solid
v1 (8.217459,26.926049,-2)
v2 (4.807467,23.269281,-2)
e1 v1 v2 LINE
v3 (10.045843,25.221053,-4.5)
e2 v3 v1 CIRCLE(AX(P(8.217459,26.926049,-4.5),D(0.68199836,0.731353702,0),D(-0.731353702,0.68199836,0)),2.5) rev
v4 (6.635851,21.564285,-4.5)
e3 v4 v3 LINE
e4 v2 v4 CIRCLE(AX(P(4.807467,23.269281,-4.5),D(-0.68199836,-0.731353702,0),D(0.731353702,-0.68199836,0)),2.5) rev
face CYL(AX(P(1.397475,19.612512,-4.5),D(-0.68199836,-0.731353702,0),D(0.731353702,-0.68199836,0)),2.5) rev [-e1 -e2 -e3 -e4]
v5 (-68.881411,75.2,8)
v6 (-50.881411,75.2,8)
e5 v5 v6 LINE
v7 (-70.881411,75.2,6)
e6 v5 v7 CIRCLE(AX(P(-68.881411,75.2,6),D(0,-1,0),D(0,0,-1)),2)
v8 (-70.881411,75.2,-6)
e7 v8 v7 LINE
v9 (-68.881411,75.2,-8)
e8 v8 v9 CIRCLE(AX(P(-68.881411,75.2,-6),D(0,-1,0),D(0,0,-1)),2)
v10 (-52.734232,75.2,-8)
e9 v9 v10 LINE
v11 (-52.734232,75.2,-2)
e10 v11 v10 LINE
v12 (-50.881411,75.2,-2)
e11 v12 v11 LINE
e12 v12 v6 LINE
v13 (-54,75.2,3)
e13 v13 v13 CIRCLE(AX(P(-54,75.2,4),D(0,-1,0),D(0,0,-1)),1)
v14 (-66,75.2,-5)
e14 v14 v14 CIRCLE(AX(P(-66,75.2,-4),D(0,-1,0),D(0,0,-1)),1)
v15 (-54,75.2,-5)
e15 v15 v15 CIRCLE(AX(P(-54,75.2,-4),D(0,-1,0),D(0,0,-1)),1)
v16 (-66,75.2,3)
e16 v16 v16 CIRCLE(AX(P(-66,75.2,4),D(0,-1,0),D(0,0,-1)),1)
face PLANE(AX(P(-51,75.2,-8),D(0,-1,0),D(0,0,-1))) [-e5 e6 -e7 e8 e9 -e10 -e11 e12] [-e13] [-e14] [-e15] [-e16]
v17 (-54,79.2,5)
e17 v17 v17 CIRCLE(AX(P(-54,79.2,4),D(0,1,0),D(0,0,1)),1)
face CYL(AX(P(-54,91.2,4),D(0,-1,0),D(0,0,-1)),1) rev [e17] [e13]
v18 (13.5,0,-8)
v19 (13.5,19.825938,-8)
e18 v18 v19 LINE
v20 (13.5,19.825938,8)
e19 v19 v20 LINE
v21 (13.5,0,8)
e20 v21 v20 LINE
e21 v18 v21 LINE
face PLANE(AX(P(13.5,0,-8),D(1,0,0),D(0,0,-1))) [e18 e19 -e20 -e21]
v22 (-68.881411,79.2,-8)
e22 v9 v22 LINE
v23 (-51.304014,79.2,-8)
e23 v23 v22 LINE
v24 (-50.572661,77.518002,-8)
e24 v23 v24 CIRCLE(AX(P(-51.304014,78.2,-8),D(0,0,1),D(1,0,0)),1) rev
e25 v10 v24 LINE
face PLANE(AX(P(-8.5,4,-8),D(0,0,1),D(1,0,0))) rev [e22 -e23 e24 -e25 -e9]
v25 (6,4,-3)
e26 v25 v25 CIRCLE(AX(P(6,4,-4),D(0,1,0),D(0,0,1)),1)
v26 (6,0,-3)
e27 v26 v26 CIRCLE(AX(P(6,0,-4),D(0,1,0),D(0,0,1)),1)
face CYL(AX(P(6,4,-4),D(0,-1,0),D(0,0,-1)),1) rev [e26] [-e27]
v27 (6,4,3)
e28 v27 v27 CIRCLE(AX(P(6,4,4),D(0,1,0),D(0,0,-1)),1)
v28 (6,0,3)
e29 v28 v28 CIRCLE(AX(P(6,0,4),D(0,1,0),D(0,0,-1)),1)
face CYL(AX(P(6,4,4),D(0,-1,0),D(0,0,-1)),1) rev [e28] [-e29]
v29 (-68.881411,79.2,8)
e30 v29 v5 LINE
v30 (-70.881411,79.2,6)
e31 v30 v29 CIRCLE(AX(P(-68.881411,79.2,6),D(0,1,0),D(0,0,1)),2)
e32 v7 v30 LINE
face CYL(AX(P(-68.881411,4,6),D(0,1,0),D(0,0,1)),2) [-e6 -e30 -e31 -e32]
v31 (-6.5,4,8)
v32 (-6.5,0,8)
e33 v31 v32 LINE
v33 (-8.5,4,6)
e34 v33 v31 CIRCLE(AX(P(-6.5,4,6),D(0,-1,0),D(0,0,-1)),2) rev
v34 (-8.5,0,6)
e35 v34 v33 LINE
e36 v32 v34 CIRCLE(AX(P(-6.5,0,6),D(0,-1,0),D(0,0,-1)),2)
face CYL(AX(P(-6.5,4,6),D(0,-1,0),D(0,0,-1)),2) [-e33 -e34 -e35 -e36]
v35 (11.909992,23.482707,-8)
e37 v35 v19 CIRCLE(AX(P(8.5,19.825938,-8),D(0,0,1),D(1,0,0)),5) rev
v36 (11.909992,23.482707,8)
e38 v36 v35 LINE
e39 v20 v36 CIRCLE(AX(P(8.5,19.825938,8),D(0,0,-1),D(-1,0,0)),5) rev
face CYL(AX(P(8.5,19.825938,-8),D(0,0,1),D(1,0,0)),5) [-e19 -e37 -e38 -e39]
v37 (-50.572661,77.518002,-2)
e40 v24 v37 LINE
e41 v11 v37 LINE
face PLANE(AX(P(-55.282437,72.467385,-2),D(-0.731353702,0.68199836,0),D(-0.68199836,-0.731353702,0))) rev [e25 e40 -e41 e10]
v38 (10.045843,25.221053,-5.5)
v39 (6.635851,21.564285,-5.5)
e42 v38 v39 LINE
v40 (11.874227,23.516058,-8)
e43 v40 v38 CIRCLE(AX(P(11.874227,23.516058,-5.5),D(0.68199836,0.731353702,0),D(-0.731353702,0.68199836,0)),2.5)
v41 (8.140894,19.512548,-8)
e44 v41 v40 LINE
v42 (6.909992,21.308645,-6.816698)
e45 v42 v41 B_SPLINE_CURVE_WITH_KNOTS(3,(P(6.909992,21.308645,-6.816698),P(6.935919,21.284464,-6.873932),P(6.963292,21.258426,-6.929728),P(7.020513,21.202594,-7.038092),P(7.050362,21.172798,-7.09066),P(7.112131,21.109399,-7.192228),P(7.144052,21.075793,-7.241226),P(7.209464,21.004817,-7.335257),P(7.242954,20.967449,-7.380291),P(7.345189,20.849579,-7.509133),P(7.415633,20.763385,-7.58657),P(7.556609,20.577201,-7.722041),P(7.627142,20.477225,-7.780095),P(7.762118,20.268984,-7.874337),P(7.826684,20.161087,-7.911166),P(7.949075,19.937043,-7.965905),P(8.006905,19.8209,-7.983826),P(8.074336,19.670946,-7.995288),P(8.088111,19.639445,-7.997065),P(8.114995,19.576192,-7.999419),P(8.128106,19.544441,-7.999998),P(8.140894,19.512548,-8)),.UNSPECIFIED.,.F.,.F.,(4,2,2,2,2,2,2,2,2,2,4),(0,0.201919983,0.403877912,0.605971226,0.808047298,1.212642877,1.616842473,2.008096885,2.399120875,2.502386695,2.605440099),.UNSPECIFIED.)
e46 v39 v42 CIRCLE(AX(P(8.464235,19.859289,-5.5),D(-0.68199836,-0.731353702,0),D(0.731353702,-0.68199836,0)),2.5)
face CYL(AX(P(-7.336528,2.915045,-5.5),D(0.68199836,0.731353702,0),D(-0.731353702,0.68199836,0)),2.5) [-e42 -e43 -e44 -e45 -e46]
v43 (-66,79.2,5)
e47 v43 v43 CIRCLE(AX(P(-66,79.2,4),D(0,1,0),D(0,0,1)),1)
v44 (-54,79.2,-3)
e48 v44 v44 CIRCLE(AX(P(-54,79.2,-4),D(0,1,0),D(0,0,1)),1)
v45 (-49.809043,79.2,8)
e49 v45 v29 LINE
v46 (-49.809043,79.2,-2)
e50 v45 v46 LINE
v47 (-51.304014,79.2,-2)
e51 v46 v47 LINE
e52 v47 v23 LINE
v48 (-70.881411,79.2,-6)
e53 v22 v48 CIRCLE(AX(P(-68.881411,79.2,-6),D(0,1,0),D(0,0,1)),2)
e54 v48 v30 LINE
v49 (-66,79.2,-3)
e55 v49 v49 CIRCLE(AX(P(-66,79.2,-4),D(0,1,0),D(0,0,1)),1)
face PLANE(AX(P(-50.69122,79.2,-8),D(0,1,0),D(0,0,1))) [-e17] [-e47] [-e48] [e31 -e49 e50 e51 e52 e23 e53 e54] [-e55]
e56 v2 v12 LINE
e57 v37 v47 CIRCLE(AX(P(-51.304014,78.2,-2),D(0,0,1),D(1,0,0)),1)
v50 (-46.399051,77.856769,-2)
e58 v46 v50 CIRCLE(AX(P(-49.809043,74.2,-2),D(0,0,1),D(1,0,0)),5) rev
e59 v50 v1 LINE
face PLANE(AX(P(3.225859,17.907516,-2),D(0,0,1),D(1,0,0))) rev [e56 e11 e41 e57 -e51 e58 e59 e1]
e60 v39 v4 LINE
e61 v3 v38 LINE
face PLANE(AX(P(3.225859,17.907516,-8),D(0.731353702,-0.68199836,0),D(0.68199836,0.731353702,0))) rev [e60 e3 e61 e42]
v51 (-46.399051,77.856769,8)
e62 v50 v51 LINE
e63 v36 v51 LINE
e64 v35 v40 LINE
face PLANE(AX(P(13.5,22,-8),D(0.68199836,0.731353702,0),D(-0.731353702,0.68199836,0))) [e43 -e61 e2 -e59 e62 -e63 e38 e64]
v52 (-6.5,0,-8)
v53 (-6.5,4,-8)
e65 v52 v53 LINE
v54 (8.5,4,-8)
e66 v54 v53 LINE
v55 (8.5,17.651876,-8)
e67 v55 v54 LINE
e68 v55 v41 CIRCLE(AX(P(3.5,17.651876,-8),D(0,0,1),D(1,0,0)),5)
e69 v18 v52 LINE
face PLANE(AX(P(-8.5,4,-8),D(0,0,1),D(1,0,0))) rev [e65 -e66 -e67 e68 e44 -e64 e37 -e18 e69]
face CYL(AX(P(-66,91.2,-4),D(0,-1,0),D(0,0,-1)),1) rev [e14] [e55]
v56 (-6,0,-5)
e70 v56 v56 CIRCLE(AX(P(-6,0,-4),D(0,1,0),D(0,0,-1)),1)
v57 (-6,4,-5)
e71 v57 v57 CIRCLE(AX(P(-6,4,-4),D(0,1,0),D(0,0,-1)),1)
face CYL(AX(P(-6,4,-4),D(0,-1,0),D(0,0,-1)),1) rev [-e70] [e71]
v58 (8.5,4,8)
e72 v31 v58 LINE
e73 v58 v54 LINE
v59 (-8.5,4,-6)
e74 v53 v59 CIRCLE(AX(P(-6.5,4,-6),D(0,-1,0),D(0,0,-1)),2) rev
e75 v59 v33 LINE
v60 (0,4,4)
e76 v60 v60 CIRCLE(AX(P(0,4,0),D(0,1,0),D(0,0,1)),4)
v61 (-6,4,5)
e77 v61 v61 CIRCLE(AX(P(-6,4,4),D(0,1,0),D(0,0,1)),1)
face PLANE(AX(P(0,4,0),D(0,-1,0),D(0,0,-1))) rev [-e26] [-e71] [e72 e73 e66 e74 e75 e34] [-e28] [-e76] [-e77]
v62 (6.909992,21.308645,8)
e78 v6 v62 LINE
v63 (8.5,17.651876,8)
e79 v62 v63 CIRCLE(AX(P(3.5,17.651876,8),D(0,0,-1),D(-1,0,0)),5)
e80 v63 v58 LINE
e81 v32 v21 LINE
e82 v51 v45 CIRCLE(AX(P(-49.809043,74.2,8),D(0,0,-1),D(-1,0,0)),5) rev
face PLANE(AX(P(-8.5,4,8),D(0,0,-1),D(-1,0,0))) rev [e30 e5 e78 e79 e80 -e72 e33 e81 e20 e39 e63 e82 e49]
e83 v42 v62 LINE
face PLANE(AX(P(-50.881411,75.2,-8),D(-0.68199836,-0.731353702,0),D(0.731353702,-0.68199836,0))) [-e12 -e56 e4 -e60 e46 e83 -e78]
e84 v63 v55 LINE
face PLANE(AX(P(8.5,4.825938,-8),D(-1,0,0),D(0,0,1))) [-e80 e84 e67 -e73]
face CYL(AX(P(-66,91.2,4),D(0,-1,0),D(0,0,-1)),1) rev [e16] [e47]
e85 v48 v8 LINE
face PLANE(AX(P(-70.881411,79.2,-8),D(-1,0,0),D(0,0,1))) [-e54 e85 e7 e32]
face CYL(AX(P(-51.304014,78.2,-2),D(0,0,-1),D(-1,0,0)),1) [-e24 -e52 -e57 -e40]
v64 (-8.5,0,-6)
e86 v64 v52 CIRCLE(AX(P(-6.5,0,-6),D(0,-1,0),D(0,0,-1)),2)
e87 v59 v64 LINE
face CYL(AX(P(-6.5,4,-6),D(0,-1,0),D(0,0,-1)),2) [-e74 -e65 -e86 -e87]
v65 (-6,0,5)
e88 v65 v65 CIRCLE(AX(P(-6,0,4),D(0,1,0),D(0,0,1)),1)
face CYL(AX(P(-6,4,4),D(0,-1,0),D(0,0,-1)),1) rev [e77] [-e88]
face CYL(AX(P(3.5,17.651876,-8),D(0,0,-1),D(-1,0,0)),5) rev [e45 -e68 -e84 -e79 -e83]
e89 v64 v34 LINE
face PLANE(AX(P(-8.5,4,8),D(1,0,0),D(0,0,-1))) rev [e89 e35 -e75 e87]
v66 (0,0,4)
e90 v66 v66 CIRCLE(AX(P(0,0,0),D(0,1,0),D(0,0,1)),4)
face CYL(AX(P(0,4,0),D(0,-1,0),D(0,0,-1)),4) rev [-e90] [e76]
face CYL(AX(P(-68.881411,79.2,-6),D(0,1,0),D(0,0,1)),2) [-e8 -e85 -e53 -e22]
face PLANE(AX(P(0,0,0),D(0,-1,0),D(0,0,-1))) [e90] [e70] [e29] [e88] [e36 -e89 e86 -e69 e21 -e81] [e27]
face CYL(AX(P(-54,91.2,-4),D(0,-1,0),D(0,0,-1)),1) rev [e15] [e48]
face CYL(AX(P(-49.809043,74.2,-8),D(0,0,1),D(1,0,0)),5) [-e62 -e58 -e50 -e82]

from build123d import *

# Parameters (mm, degrees)
SKETCH_1_W          = 17
SKETCH_1_H          = 16
SKETCH_1_R          = 1
SKETCH_1_R_2        = 4
EXTRUDE_1_DEPTH     = 4
EXTRUDE_2_DEPTH     = 16
SKETCH_4_R          = 1
CUT_EXTRUDE_1_DEPTH = 16
FILLET_1_R          = 2
FILLET_2_R          = 5
SKETCH_7_W          = 6
SKETCH_7_H          = 80
CUT_EXTRUDE_2_DEPTH = 10
FILLET_3_R          = 1
FILLET_4_R          = 2.5


with BuildPart() as part:
    # 草图1 → 凸台-拉伸1 (new body)
    with BuildSketch(Plane(origin=(0, 0, 0), x_dir=(1, 0, 0), z_dir=(0, 1, 0))):
        Rectangle(SKETCH_1_W, SKETCH_1_H)
        with Locations(Location((6, 4, 0), (0, 0, 270))):
            Circle(SKETCH_1_R, mode=Mode.SUBTRACT)
        with Locations(Location((-6, 4, 0), (0, 0, 90))):
            Circle(SKETCH_1_R, mode=Mode.SUBTRACT)
        with Locations(Location((6, -4, 0), (0, 0, 90))):
            Circle(SKETCH_1_R, mode=Mode.SUBTRACT)
        with Locations(Location((-6, -4, 0), (0, 0, 270))):
            Circle(SKETCH_1_R, mode=Mode.SUBTRACT)
        with Locations(Location((0, 0, 0), (0, 0, 270))):
            Circle(SKETCH_1_R_2, mode=Mode.SUBTRACT)
    extrude(amount=EXTRUDE_1_DEPTH)

    # 草图2 → 凸台-拉伸2 (add)
    with BuildSketch(Plane.XY.offset(8)):
        Polygon((8.5, 4.825938125), (8.5, 0), (13.5, 0), (13.5, 22), (-47.839490213, 79.2), (-50.691220222, 79.2), (-70.881411302, 79.2), (-70.881411302, 75.2), (-51, 75.2), (-50.881411302, 75.2), (8.5, 19.825938125), align=None)
    extrude(amount=-EXTRUDE_2_DEPTH)

    # 草图4 → 切除-拉伸1 (cut)
    with BuildSketch(Plane.XZ.offset(-75.2)):
        with Locations(Location((-54, 4, 0), (0, 0, 270))):
            Circle(SKETCH_4_R)
        with Locations(Location((-54, -4, 0), (0, 0, 270))):
            Circle(SKETCH_4_R)
        with Locations(Location((-66, -4, 0), (0, 0, 270))):
            Circle(SKETCH_4_R)
        with Locations(Location((-66, 4, 0), (0, 0, 270))):
            Circle(SKETCH_4_R)
    extrude(amount=-CUT_EXTRUDE_1_DEPTH, mode=Mode.SUBTRACT)

    # 圆角1
    fillet_1_edges = [part.edges().sort_by_distance(p)[0] for p in [
        (-70.881411302, 77.2, -8),
        (-70.881411302, 77.2, 8),
        (-8.5, 2, 8),
        (-8.5, 2, -8),
    ]]
    fillet(fillet_1_edges, radius=FILLET_1_R)

    # 圆角2
    fillet_2_edges = [part.edges().sort_by_distance(p)[0] for p in [
        (8.5, 19.825938125, 0),
        (-47.839490213, 79.2, 0),
        (13.5, 22, 0),
    ]]
    fillet(fillet_2_edges, radius=FILLET_2_R)

    # 草图7 → 切除-拉伸2 (cut)
    with BuildSketch(Plane(origin=(17.252348355, 18.50087855, 0), x_dir=(0, 0, -1), z_dir=(0.6819983600624965, 0.7313537016191725, 0))):
        with Locations((5, 49.853652648)):
            Rectangle(SKETCH_7_W, SKETCH_7_H)
    extrude(amount=-CUT_EXTRUDE_2_DEPTH, mode=Mode.SUBTRACT)

    # 圆角3
    # the kernel refuses this fillet: 1 mm, written as the material it takes off along each edge
    with BuildSketch(Plane(origin=(-49.057187154, 79.143148127, -2), x_dir=(-0.9996800282081353, 0.02529508256127706, 0), z_dir=(0, 0, -1))) as fillet_3_piece_1:
        with BuildLine():
            CenterArc((2.222251386, -0.999680028), FILLET_3_R, 88.550543928, 133)
            Line((1.473880493, -1.662960516), (1.399043403, -1.729288565))
            Line((1.399043403, -1.729288565), (-0.074837089, -0.066328049))
            Line((-0.074837089, -0.066328049), (-0.012531551, 0.099211694))
            ThreePointArc((-0.012531551, 0.099211694), (0.755582446, 0.13778344), (2.250075977, 0.099968003))
            Line((2.250075977, 0.099968003), (2.247546469, 0))
        make_face()
    extrude(amount=11.618866172, mode=Mode.SUBTRACT)

    # 圆角4
    fillet_4_edges = [part.edges().sort_by_distance(p)[0] for p in [
        (8.340847116, 23.392669243, -2),
        (8.340847116, 23.392669243, -8),
    ]]
    fillet(fillet_4_edges, radius=FILLET_4_R)


solid = part.part
